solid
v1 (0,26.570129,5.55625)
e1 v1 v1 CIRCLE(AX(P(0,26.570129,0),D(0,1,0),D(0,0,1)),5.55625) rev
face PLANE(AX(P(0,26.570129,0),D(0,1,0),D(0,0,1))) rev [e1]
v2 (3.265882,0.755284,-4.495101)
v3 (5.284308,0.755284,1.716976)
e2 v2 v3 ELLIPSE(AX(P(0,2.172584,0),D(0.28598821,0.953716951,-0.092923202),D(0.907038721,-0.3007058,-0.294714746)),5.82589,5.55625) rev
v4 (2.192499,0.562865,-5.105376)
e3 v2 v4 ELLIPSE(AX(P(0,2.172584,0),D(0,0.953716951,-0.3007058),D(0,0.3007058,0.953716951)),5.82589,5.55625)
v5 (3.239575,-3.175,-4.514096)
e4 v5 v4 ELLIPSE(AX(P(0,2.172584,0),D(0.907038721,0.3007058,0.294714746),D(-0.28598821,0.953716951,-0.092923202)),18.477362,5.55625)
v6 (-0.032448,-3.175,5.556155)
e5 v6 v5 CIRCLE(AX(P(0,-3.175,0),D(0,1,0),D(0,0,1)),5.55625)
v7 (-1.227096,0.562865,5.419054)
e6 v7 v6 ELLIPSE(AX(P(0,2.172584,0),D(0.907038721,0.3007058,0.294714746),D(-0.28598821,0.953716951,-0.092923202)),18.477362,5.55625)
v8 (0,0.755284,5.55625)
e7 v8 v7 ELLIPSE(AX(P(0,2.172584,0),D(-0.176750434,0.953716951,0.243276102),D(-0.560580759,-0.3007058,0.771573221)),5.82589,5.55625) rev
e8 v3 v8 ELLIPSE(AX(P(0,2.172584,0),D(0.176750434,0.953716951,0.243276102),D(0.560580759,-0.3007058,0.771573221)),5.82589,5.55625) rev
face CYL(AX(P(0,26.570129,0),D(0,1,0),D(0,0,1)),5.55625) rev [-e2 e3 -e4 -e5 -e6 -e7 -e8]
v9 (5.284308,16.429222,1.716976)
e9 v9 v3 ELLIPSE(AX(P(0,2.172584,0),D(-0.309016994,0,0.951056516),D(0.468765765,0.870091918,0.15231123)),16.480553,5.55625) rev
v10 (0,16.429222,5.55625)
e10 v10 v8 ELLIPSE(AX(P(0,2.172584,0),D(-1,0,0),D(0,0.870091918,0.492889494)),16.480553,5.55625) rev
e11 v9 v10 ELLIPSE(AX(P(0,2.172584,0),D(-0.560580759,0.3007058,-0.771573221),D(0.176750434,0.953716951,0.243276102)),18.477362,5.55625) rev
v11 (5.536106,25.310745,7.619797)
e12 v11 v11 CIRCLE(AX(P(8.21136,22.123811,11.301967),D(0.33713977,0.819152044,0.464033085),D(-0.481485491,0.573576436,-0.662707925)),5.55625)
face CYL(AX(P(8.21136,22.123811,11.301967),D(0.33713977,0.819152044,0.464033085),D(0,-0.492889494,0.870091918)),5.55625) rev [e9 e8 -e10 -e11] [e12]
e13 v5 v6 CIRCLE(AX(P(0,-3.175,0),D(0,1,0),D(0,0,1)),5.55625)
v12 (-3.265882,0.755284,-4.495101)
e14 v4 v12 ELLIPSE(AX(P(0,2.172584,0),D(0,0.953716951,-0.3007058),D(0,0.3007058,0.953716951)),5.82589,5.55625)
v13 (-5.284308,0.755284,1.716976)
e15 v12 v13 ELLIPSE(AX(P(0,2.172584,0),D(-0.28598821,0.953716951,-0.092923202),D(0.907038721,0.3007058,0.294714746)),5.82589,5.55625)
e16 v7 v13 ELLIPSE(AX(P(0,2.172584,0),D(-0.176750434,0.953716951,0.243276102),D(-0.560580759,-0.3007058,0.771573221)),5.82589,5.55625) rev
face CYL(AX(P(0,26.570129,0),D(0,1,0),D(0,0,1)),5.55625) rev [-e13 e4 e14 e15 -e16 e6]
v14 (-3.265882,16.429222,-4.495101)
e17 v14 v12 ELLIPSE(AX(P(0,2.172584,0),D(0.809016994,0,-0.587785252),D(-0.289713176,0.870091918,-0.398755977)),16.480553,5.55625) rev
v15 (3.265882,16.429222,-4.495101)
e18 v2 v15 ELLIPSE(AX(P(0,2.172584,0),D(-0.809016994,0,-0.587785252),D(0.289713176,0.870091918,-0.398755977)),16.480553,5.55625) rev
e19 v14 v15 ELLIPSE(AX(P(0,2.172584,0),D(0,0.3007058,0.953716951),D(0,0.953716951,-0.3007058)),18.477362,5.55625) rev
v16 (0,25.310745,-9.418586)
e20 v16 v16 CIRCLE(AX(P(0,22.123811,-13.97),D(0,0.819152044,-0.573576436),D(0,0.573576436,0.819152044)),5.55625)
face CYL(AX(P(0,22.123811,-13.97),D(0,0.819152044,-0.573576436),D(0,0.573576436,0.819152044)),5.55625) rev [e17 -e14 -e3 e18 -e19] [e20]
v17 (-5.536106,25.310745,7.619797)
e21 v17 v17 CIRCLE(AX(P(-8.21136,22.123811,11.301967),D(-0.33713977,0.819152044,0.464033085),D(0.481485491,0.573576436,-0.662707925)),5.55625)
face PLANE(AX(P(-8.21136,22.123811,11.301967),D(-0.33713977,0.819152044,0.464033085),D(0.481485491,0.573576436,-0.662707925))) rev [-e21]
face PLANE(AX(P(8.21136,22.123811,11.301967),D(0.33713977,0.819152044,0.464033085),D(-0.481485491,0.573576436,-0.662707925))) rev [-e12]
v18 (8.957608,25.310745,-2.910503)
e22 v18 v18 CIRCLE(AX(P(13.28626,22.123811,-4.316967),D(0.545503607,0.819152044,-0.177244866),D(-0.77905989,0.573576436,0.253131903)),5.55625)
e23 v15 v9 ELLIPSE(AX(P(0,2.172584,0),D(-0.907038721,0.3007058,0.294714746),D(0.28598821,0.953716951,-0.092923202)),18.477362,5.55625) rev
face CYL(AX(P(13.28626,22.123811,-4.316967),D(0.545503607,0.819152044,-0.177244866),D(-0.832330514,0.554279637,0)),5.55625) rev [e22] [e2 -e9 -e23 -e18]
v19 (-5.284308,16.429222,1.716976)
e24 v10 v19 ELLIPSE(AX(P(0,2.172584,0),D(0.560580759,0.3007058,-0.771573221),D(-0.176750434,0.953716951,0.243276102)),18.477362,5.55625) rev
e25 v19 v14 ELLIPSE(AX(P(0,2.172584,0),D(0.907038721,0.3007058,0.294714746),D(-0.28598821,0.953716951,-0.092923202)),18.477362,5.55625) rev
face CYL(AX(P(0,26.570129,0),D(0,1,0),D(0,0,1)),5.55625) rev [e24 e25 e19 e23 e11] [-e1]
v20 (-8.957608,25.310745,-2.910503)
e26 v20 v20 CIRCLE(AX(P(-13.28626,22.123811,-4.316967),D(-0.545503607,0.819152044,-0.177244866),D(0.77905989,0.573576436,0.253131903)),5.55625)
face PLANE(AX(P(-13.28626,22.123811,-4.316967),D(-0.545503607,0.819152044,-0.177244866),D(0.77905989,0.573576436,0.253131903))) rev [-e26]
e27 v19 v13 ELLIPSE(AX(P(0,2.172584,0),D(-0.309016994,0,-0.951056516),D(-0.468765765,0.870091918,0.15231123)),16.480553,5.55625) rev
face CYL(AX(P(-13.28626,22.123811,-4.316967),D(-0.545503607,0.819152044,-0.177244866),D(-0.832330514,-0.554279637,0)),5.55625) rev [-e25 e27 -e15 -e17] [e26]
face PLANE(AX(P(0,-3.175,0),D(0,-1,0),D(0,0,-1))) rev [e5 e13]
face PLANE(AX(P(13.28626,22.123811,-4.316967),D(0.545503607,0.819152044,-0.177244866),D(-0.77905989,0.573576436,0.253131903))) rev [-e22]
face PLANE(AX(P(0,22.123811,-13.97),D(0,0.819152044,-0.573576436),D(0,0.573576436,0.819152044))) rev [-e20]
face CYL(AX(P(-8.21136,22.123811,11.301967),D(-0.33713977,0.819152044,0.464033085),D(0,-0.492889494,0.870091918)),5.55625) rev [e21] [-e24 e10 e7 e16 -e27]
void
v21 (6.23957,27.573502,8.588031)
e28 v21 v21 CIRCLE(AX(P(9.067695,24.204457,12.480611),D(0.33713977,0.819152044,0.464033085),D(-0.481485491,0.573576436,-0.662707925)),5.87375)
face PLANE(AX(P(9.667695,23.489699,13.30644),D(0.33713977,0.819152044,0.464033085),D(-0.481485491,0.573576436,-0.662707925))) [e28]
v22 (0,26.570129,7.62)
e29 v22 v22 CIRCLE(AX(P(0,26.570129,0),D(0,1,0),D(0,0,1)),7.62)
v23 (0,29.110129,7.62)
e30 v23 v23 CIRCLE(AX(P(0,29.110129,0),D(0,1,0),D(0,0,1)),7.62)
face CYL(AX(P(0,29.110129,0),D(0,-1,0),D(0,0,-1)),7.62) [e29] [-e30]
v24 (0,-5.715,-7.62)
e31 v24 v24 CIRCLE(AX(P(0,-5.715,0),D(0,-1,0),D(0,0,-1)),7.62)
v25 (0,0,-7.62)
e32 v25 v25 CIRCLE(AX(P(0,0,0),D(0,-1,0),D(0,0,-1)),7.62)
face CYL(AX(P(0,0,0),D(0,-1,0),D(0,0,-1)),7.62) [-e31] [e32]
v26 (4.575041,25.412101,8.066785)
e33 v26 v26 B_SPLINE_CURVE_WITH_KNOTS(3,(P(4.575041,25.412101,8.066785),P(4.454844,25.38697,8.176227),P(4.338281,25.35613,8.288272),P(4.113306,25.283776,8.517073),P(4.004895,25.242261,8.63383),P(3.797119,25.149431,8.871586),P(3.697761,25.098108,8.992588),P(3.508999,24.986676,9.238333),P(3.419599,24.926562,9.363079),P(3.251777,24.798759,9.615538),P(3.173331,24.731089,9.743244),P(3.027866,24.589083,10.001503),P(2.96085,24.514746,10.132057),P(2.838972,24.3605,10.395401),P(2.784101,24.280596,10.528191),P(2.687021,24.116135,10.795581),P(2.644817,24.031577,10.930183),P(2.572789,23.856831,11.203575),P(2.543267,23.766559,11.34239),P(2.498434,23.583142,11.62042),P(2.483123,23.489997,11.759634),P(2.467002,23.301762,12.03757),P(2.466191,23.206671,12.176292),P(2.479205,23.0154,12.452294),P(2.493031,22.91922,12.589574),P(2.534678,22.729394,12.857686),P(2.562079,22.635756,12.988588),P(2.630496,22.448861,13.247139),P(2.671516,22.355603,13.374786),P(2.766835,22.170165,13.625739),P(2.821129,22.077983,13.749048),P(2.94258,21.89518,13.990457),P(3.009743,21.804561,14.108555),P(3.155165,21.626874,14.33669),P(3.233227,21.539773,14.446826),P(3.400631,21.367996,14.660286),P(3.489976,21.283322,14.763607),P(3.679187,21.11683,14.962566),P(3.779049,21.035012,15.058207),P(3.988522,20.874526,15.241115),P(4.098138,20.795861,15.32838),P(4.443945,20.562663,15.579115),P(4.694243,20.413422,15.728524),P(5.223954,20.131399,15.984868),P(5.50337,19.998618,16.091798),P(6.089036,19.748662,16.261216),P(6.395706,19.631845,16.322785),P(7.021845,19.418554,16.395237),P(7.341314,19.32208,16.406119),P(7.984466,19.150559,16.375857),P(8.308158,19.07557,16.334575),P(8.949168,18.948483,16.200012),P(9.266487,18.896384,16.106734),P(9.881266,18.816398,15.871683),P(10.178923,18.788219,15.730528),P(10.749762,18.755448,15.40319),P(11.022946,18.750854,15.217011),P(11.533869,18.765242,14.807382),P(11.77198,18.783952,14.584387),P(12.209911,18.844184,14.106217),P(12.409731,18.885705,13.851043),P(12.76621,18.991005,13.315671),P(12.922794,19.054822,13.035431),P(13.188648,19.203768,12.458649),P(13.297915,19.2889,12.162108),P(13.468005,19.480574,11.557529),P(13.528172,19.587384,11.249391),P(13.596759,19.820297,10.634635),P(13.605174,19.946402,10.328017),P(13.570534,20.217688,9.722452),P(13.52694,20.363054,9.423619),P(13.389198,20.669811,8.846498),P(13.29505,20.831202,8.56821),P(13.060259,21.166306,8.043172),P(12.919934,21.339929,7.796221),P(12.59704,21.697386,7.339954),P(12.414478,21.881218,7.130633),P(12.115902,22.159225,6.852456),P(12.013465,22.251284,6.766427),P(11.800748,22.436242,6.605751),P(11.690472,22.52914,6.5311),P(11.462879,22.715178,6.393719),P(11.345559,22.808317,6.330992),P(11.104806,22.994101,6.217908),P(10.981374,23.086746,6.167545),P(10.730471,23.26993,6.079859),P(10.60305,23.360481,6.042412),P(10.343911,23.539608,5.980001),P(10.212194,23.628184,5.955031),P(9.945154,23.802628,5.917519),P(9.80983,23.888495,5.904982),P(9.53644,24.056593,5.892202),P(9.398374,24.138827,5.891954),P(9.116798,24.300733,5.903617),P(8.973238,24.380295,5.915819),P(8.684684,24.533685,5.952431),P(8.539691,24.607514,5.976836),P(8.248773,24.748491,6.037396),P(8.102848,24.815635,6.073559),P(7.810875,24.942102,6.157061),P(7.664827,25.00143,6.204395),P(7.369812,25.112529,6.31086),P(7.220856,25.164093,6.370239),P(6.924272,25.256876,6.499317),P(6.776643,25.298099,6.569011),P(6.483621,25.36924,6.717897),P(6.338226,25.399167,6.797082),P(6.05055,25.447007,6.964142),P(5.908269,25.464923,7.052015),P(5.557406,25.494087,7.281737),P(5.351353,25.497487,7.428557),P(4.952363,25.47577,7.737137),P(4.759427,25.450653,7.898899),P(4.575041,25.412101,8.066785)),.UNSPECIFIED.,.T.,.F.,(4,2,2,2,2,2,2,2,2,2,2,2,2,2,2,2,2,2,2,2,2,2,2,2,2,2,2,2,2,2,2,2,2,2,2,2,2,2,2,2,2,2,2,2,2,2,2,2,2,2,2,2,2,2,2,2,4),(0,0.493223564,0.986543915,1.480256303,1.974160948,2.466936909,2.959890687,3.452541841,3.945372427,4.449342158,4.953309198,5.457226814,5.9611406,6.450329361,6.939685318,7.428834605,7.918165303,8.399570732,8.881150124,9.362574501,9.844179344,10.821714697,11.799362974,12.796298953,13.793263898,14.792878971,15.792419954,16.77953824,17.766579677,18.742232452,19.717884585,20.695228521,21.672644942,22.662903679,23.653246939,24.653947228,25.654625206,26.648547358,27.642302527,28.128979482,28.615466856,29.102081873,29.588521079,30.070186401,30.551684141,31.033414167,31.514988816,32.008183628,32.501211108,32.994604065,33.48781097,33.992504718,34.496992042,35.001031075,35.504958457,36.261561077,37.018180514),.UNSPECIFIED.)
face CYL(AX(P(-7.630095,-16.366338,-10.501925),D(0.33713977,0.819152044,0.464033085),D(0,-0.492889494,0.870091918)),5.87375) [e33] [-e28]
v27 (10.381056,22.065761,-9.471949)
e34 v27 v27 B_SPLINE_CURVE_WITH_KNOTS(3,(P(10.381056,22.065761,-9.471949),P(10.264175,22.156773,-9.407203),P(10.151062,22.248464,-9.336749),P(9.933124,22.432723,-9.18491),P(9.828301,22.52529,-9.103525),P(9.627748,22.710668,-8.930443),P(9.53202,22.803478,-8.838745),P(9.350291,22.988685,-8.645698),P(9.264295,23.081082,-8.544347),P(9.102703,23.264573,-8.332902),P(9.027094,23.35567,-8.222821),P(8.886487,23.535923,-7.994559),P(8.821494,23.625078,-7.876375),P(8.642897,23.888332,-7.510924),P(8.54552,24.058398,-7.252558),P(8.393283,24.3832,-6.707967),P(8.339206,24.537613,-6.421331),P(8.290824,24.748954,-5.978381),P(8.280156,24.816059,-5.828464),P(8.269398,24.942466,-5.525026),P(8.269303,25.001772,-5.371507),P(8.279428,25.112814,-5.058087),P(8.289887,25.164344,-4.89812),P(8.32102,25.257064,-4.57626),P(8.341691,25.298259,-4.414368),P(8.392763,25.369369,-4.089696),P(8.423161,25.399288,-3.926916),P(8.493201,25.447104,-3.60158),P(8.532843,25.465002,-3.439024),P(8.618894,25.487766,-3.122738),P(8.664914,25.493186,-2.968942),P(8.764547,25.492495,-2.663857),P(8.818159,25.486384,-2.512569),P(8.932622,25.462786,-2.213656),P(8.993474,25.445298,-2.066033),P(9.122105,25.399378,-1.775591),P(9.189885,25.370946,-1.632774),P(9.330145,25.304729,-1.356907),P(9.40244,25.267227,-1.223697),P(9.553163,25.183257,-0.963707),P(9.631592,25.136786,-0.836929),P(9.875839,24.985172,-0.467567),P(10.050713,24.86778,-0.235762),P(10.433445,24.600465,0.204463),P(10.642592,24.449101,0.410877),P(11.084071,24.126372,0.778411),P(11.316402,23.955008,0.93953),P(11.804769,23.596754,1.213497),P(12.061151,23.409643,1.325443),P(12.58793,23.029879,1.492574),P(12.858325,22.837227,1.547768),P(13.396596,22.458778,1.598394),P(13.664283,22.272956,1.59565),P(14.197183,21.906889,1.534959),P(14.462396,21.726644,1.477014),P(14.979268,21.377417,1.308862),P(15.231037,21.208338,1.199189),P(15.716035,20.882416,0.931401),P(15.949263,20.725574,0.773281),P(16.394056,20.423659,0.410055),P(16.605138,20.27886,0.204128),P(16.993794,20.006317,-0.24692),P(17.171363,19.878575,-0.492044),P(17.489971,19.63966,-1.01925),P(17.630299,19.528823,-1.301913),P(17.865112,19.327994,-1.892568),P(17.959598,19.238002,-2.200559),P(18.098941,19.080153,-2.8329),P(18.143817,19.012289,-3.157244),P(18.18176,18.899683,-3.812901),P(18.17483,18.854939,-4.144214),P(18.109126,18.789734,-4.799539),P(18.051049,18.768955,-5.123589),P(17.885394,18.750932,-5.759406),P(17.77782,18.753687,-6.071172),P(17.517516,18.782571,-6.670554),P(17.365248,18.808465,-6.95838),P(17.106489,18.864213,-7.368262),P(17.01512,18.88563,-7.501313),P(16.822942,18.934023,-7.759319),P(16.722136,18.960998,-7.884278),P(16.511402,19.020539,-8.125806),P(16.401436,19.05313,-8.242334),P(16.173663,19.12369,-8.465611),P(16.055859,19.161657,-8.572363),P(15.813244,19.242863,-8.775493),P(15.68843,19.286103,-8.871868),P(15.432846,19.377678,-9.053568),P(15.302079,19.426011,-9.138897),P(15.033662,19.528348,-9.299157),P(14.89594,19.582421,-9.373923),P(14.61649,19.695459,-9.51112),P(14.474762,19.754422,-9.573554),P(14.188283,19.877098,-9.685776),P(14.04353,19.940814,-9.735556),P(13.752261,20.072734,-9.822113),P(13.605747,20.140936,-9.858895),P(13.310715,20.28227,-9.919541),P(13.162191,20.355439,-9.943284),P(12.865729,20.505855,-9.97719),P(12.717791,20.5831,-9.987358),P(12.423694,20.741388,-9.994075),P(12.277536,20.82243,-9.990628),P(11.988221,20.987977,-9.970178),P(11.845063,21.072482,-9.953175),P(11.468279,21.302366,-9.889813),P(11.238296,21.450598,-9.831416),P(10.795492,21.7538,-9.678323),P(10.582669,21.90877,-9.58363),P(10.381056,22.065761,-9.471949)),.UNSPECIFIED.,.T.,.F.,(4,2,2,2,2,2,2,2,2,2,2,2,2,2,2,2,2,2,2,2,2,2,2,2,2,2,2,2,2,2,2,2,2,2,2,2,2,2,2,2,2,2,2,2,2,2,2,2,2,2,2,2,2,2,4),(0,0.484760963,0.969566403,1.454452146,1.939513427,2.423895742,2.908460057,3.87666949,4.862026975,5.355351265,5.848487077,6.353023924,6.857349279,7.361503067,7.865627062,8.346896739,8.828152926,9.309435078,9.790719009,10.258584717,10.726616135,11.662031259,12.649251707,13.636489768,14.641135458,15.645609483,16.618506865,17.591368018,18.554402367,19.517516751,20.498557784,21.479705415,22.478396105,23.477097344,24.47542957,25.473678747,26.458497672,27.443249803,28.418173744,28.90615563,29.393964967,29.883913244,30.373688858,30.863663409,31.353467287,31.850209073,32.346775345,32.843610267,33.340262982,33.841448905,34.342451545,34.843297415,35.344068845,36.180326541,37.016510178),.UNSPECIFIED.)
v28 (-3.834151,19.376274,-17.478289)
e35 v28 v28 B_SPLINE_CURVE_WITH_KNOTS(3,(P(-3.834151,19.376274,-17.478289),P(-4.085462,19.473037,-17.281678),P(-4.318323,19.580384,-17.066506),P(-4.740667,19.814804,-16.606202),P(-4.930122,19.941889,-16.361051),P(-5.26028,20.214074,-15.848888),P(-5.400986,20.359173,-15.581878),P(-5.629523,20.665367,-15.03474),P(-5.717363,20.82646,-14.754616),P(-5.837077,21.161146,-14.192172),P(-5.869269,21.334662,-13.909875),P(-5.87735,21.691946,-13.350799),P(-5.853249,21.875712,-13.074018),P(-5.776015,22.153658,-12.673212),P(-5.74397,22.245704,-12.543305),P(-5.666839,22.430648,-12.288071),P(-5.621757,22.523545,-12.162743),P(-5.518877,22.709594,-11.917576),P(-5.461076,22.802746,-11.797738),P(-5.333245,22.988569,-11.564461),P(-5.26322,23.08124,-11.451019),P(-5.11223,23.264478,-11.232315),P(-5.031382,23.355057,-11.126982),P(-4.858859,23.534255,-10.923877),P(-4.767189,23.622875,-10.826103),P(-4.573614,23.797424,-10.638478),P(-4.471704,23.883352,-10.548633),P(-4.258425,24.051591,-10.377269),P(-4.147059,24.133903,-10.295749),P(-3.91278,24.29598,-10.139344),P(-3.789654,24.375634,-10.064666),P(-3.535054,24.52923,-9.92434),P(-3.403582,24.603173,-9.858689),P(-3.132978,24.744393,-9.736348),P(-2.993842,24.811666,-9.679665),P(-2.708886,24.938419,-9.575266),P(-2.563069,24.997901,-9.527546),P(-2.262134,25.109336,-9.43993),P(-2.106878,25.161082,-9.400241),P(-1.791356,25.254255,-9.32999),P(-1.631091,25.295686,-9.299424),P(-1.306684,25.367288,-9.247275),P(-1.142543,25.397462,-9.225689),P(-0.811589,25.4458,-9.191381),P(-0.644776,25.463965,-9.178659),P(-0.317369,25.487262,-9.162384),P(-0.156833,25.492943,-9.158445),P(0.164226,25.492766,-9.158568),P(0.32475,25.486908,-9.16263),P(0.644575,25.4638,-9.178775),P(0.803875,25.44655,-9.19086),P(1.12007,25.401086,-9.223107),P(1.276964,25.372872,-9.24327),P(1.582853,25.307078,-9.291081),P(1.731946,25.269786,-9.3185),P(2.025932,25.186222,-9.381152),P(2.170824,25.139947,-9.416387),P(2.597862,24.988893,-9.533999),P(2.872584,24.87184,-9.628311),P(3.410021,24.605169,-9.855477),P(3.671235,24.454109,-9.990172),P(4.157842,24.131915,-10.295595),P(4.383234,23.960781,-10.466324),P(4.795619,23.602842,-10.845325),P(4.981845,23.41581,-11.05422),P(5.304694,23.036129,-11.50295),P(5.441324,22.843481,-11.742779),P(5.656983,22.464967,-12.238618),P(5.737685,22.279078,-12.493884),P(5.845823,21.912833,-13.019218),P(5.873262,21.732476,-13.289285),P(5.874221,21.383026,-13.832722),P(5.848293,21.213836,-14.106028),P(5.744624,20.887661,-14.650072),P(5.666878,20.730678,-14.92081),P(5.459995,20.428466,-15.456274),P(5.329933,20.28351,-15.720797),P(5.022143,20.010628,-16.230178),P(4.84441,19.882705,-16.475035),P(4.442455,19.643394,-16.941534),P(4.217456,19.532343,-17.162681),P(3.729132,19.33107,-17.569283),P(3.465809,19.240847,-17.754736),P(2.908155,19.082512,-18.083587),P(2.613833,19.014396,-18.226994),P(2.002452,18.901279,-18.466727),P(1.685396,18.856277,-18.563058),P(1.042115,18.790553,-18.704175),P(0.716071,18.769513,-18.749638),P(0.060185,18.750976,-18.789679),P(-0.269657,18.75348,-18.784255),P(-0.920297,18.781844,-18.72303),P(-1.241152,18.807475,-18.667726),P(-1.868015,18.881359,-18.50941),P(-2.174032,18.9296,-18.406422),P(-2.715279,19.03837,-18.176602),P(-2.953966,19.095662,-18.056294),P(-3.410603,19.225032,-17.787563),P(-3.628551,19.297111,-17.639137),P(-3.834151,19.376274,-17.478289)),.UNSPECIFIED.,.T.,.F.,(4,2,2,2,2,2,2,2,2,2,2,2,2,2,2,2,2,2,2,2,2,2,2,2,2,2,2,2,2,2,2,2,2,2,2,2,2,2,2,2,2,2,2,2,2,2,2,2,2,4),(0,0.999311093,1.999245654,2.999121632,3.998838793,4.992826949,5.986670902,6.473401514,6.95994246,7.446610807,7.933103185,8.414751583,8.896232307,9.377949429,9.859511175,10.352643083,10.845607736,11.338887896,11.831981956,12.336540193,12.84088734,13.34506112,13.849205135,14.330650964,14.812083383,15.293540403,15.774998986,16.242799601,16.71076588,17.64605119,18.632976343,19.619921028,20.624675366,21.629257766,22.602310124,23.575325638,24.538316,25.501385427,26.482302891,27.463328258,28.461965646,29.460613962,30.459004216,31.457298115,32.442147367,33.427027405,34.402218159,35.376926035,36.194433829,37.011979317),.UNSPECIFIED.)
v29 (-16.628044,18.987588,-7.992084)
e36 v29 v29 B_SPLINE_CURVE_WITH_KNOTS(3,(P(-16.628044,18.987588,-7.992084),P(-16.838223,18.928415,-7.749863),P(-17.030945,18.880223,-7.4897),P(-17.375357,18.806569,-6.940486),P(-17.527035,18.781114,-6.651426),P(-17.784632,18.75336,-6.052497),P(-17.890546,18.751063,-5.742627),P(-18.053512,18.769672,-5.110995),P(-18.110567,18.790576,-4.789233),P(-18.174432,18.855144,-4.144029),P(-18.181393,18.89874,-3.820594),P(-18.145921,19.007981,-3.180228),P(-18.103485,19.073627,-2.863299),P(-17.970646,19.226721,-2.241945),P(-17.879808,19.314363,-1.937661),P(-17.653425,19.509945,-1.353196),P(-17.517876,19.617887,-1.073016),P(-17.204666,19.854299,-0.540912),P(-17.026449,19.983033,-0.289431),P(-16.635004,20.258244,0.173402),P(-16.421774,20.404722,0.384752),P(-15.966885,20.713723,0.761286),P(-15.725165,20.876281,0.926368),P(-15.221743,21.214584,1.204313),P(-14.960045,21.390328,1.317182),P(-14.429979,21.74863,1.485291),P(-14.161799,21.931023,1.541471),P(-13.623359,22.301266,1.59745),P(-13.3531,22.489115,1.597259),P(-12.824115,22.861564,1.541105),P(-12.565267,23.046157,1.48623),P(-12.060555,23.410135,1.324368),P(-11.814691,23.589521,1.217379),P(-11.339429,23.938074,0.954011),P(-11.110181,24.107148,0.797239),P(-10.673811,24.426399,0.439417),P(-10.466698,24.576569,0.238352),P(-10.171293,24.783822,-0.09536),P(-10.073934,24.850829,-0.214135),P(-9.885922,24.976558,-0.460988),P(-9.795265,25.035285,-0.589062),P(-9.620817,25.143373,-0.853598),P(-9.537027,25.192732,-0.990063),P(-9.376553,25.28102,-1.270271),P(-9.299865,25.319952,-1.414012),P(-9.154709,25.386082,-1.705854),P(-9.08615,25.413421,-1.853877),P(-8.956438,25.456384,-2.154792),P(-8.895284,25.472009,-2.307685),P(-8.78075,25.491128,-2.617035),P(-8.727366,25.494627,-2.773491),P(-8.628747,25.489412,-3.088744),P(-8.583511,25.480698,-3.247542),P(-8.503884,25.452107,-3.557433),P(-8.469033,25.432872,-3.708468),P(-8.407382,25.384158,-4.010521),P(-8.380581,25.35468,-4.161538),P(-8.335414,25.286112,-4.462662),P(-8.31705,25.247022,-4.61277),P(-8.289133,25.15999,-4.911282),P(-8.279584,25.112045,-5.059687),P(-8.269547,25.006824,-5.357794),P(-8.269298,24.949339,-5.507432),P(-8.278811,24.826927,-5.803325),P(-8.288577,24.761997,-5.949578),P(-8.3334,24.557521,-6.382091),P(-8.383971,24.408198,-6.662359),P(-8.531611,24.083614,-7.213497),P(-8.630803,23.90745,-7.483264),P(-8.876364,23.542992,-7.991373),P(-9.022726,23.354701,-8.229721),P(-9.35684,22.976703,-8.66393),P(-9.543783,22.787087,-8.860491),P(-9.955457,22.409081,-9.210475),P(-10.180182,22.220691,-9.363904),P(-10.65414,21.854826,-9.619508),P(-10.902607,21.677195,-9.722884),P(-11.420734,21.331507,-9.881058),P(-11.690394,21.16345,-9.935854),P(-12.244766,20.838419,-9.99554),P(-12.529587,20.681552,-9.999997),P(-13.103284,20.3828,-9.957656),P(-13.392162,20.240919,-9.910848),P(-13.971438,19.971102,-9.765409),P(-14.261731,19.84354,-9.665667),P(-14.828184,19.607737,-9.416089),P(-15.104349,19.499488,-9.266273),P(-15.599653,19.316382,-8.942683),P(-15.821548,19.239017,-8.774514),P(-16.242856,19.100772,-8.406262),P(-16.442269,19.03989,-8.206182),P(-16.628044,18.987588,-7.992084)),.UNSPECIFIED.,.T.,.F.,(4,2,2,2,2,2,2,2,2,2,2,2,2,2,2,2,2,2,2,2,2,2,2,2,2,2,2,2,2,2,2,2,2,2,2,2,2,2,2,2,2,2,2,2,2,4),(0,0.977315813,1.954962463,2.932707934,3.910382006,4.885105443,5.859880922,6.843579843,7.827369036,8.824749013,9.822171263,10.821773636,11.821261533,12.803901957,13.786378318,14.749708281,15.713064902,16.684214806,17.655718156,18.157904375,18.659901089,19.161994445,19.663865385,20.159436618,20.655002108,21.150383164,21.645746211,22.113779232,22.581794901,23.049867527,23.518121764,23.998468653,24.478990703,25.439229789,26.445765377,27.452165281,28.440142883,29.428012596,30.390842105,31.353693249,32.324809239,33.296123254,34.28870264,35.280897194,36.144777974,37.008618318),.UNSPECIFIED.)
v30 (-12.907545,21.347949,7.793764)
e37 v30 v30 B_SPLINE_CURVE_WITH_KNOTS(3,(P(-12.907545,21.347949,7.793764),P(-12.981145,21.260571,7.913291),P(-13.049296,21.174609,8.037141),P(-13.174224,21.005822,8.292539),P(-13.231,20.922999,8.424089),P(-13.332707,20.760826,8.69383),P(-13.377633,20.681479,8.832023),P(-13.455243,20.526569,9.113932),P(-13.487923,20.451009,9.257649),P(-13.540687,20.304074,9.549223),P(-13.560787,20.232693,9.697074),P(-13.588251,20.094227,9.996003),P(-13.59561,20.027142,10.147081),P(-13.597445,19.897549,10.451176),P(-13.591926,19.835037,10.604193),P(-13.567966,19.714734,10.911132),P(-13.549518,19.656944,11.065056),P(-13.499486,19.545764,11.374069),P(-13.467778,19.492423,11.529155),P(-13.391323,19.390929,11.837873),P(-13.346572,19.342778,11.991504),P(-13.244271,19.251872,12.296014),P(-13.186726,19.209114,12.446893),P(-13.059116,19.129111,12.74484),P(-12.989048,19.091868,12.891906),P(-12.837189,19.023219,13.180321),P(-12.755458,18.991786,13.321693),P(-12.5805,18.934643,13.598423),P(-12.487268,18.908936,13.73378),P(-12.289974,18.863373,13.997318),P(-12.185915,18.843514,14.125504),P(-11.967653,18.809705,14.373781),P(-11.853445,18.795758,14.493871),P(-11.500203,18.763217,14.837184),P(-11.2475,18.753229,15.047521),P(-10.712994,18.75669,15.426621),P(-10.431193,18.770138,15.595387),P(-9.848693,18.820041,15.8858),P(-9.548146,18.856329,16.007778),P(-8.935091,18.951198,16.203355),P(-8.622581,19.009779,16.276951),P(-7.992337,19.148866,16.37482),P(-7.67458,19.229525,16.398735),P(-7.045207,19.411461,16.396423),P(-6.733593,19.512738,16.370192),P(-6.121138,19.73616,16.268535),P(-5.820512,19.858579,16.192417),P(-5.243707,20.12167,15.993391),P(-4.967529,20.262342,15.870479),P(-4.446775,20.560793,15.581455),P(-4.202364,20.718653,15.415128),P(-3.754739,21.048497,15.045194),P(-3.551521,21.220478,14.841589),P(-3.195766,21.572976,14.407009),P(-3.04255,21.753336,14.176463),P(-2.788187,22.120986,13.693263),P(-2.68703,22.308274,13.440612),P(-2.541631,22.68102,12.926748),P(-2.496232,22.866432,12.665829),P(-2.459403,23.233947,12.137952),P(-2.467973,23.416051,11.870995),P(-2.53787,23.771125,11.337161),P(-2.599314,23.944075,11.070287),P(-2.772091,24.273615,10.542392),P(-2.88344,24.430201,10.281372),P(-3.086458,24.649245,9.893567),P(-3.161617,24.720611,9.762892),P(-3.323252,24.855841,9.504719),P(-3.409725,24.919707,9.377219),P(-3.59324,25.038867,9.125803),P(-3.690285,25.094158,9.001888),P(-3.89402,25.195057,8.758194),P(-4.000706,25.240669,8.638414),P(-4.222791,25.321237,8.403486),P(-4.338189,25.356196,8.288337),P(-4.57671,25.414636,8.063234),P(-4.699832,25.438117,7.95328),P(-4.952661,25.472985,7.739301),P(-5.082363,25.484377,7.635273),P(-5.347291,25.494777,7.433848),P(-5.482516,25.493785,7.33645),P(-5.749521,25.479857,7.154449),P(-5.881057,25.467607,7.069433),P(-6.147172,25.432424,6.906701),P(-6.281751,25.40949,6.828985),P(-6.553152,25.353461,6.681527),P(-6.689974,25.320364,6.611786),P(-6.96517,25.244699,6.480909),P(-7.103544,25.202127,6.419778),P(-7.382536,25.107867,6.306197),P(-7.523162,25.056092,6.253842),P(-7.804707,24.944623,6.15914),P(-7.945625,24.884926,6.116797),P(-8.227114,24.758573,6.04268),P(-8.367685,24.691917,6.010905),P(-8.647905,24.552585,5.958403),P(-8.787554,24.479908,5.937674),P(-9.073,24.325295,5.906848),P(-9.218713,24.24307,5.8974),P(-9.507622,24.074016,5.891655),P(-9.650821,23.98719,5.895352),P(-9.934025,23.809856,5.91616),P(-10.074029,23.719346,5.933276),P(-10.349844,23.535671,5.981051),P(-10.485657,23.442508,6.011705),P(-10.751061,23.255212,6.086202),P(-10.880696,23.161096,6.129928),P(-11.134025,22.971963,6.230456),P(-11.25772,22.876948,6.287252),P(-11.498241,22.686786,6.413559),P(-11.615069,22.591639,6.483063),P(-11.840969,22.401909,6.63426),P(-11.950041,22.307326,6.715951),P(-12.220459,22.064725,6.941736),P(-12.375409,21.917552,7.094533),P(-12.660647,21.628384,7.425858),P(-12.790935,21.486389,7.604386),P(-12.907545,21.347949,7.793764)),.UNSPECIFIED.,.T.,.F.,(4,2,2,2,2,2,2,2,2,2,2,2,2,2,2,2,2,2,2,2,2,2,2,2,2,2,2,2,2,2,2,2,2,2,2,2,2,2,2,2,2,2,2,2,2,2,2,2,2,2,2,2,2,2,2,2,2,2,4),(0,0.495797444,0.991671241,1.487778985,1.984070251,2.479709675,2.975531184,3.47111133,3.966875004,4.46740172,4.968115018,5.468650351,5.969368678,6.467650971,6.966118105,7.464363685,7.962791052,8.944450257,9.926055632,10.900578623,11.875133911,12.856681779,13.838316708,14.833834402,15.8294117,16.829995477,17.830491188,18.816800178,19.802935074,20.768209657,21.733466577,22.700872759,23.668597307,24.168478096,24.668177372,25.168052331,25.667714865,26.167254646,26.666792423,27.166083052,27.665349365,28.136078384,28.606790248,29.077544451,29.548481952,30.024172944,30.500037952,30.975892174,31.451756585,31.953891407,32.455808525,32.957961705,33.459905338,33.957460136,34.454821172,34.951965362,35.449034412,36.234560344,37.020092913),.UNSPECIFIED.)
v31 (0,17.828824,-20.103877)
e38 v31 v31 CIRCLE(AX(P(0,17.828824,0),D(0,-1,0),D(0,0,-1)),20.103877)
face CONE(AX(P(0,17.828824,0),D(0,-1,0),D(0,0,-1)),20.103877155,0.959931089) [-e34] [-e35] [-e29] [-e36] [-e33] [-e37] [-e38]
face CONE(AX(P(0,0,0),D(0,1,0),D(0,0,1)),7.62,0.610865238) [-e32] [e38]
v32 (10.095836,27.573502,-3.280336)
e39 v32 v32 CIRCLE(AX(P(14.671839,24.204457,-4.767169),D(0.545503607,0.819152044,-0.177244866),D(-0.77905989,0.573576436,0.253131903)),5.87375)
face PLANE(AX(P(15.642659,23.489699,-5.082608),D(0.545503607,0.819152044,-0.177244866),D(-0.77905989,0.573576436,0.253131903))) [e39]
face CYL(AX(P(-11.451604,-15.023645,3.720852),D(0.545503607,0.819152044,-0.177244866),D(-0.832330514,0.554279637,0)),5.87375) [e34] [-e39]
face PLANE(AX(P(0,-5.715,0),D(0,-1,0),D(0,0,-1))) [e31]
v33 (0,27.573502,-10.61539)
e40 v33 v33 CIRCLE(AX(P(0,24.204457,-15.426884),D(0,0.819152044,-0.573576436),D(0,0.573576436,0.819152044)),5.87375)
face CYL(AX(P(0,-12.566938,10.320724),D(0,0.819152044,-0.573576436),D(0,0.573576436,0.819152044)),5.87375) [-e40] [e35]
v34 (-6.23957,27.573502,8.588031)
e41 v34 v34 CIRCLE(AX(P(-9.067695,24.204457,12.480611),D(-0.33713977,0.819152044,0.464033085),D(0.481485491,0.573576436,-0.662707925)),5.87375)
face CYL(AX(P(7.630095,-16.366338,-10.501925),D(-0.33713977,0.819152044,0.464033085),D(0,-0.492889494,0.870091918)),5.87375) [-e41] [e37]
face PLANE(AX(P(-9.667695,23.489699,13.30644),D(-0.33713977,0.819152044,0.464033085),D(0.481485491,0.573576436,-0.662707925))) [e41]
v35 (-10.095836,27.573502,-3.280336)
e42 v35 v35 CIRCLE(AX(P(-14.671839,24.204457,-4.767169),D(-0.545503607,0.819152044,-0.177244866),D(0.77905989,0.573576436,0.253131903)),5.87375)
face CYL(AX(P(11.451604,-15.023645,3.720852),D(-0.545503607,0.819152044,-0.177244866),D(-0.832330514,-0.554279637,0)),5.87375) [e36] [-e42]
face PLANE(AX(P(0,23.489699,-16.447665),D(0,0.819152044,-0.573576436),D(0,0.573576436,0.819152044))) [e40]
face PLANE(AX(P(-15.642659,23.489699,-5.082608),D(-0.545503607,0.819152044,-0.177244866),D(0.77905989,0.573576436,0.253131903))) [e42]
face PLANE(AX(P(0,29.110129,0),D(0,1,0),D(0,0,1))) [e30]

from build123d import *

# Parameters (mm, degrees)
F_7_16_0_4375_DIAMETER_HOLE1_D         = 11.1125
F_7_16_START                           = 1.779676233
F_7_16_0_4375_DIAMETER_HOLE2_OUTLINE_R = 5.55625
F_7_16_0_4375_DIAMETER_HOLE2_DEPTH     = 24.355951698
CIRPATTERN1_COUNT                      = 5
SKETCH11_R                             = 7.62
BOSS_EXTRUDE1_DEPTH                    = 2.54
BOSS_EXTRUDE2_START                    = 2.54
SKETCH12_R                             = 7.62
BOSS_EXTRUDE2_DEPTH                    = 2.54
BOSS_EXTRUDE3_REACH                    = 52.922
SKETCH13_R                             = 5.87375
SKETCH13_R_2                           = 5.55625
CUT_EXTRUDE1_START                     = -3.182233
SKETCH14_R                             = 5.55625
CUT_EXTRUDE1_DEPTH                     = 0.642233
CIRPATTERN3_COUNT                      = 5


# Read off the part's stored shape, not the designer's step: 7/16 (0.4375) Diameter Hole2
with BuildPart() as part:
    # Sketch1 → Revolve1 (revolve)
    with BuildSketch(Plane.XY, mode=Mode.PRIVATE) as revolve1_sk:
        Polygon((0, 0), (0, 26.570129165), (7.62, 26.570129165), (20.103877155, 17.828824275), (7.62, 0), (7.62, -3.175), (0, -3.175), align=None)
    revolve(revolve1_sk.sketch.rotate(Axis((0, 0, 0), (0, 1, 0)), 90), axis=Axis((0, 0, 0), (0, 1, 0)))

    # 7/16 (0.4375) Diameter Hole1 (through all)
    with Locations(Plane(origin=(0, 26.570129165, 0), x_dir=(1, 0, 0), z_dir=(0, 1, 0))):
        with Locations((0, 0)):
            Hole(F_7_16_0_4375_DIAMETER_HOLE1_D / 2)

    # 7/16 (0.4375) Diameter Hole2 outline → 7/16 (0.4375) Diameter Hole2 (cut)
    with BuildSketch(Plane(origin=(0, 0, 0), x_dir=(1, 0, 0), z_dir=(0, 0.8191520442889911, -0.5735764363510472)).offset(F_7_16_START)):
        with Locations((0, -1.246142784)):
            Circle(F_7_16_0_4375_DIAMETER_HOLE2_OUTLINE_R)
    f_7_16_0_4375_diameter_hole2 = extrude(amount=F_7_16_0_4375_DIAMETER_HOLE2_DEPTH, mode=Mode.SUBTRACT)

    # CirPattern1: 7/16 (0.4375) Diameter Hole2 ×5 about axis
    cirpattern1_axis = Axis((0, 26.570129165, 0), (0, 1, 0))
    for i in range(1, CIRPATTERN1_COUNT):
        add(f_7_16_0_4375_diameter_hole2.rotate(cirpattern1_axis, i * 360 / CIRPATTERN1_COUNT), mode=Mode.SUBTRACT)

    # Sketch11 → Boss-Extrude1 (add)
    with BuildSketch(Plane(origin=(0, 26.570129165, 0), x_dir=(1, 0, 0), z_dir=(0, 1, 0))):
        with Locations(Location((0, 0, 0), (0, 0, 90))):
            Circle(SKETCH11_R)
    extrude(amount=BOSS_EXTRUDE1_DEPTH)

    # Sketch12 → Boss-Extrude2 (add)
    with BuildSketch(Plane.XZ.offset(3.175).offset(BOSS_EXTRUDE2_START)):
        with Locations(Location((0, 0, 0), (0, 0, 270))):
            Circle(SKETCH12_R)
    extrude(amount=-BOSS_EXTRUDE2_DEPTH)

    # Boss-Extrude3: up to this cone (the profile starts outside it)
    boss_extrude3_end = Plane(origin=(0, 22.5675805, 0), z_dir=(0, -1, 0)).offset(-9.338129106) * Cone(1.428e-06, 111.014569628, 77.733237505, align=(Align.CENTER, Align.CENTER, Align.MIN), mode=Mode.PRIVATE)
    # Sketch13 → Boss-Extrude3 (add, up to the surface)
    with BuildSketch(Plane(origin=(0, 23.489699353, -16.447664557), x_dir=(1, 0, 0), z_dir=(0, 0.8191520442889909, -0.5735764363510475)), mode=Mode.PRIVATE) as boss_extrude3_sk1:
        with Locations(Location((0, -1.246142784, 0), (0, 0, 270))):
            Circle(SKETCH13_R)
        with Locations(Location((0, -1.246142784, 0), (0, 0, 306))):
            Circle(SKETCH13_R_2, mode=Mode.SUBTRACT)
    boss_extrude3_tool1 = extrude(boss_extrude3_sk1.sketch, amount=-BOSS_EXTRUDE3_REACH, mode=Mode.PRIVATE) - boss_extrude3_end
    # Sketch13 → Boss-Extrude3 (add, up to the surface)
    with BuildSketch(Plane(origin=(0, 23.489699353, -16.447664557), x_dir=(1, 0, 0), z_dir=(0, 0.8191520442889909, -0.5735764363510475)), mode=Mode.PRIVATE) as boss_extrude3_sk2:
        with Locations(Location((0, -1.246142784, 0), (0, 0, 306))):
            Circle(SKETCH13_R_2)
    boss_extrude3_tool2 = extrude(boss_extrude3_sk2.sketch, amount=-BOSS_EXTRUDE3_REACH, mode=Mode.PRIVATE) - boss_extrude3_end
    boss_extrude3 = boss_extrude3_tool1.solids().sort_by_distance((0, 20.930704, -20.102289))[0] + boss_extrude3_tool2.solids().sort_by_distance((0, 24.204457, -15.426884))[0]
    add(boss_extrude3)

    # Sketch14 → Cut-Extrude1 (cut)
    with BuildSketch(Plane(origin=(0, 23.489699353, -16.447664557), x_dir=(1, 0, 0), z_dir=(0, 0.8191520442889909, -0.5735764363510475)).offset(CUT_EXTRUDE1_START)):
        with Locations(Location((0, -1.246142784, 0), (0, 0, 270))):
            Circle(SKETCH14_R)
    cut_extrude1 = extrude(amount=CUT_EXTRUDE1_DEPTH, mode=Mode.SUBTRACT)

    # CirPattern3: Boss-Extrude3, Cut-Extrude1 ×5 about axis
    cirpattern3_axis = Axis((0, 0, 0), (0, 1, 0))
    add([boss_extrude3.rotate(cirpattern3_axis, i * 360 / CIRPATTERN3_COUNT) for i in range(1, CIRPATTERN3_COUNT)])
    add([cut_extrude1.rotate(cirpattern3_axis, i * 360 / CIRPATTERN3_COUNT) for i in range(1, CIRPATTERN3_COUNT)], mode=Mode.SUBTRACT)


solid = part.part
